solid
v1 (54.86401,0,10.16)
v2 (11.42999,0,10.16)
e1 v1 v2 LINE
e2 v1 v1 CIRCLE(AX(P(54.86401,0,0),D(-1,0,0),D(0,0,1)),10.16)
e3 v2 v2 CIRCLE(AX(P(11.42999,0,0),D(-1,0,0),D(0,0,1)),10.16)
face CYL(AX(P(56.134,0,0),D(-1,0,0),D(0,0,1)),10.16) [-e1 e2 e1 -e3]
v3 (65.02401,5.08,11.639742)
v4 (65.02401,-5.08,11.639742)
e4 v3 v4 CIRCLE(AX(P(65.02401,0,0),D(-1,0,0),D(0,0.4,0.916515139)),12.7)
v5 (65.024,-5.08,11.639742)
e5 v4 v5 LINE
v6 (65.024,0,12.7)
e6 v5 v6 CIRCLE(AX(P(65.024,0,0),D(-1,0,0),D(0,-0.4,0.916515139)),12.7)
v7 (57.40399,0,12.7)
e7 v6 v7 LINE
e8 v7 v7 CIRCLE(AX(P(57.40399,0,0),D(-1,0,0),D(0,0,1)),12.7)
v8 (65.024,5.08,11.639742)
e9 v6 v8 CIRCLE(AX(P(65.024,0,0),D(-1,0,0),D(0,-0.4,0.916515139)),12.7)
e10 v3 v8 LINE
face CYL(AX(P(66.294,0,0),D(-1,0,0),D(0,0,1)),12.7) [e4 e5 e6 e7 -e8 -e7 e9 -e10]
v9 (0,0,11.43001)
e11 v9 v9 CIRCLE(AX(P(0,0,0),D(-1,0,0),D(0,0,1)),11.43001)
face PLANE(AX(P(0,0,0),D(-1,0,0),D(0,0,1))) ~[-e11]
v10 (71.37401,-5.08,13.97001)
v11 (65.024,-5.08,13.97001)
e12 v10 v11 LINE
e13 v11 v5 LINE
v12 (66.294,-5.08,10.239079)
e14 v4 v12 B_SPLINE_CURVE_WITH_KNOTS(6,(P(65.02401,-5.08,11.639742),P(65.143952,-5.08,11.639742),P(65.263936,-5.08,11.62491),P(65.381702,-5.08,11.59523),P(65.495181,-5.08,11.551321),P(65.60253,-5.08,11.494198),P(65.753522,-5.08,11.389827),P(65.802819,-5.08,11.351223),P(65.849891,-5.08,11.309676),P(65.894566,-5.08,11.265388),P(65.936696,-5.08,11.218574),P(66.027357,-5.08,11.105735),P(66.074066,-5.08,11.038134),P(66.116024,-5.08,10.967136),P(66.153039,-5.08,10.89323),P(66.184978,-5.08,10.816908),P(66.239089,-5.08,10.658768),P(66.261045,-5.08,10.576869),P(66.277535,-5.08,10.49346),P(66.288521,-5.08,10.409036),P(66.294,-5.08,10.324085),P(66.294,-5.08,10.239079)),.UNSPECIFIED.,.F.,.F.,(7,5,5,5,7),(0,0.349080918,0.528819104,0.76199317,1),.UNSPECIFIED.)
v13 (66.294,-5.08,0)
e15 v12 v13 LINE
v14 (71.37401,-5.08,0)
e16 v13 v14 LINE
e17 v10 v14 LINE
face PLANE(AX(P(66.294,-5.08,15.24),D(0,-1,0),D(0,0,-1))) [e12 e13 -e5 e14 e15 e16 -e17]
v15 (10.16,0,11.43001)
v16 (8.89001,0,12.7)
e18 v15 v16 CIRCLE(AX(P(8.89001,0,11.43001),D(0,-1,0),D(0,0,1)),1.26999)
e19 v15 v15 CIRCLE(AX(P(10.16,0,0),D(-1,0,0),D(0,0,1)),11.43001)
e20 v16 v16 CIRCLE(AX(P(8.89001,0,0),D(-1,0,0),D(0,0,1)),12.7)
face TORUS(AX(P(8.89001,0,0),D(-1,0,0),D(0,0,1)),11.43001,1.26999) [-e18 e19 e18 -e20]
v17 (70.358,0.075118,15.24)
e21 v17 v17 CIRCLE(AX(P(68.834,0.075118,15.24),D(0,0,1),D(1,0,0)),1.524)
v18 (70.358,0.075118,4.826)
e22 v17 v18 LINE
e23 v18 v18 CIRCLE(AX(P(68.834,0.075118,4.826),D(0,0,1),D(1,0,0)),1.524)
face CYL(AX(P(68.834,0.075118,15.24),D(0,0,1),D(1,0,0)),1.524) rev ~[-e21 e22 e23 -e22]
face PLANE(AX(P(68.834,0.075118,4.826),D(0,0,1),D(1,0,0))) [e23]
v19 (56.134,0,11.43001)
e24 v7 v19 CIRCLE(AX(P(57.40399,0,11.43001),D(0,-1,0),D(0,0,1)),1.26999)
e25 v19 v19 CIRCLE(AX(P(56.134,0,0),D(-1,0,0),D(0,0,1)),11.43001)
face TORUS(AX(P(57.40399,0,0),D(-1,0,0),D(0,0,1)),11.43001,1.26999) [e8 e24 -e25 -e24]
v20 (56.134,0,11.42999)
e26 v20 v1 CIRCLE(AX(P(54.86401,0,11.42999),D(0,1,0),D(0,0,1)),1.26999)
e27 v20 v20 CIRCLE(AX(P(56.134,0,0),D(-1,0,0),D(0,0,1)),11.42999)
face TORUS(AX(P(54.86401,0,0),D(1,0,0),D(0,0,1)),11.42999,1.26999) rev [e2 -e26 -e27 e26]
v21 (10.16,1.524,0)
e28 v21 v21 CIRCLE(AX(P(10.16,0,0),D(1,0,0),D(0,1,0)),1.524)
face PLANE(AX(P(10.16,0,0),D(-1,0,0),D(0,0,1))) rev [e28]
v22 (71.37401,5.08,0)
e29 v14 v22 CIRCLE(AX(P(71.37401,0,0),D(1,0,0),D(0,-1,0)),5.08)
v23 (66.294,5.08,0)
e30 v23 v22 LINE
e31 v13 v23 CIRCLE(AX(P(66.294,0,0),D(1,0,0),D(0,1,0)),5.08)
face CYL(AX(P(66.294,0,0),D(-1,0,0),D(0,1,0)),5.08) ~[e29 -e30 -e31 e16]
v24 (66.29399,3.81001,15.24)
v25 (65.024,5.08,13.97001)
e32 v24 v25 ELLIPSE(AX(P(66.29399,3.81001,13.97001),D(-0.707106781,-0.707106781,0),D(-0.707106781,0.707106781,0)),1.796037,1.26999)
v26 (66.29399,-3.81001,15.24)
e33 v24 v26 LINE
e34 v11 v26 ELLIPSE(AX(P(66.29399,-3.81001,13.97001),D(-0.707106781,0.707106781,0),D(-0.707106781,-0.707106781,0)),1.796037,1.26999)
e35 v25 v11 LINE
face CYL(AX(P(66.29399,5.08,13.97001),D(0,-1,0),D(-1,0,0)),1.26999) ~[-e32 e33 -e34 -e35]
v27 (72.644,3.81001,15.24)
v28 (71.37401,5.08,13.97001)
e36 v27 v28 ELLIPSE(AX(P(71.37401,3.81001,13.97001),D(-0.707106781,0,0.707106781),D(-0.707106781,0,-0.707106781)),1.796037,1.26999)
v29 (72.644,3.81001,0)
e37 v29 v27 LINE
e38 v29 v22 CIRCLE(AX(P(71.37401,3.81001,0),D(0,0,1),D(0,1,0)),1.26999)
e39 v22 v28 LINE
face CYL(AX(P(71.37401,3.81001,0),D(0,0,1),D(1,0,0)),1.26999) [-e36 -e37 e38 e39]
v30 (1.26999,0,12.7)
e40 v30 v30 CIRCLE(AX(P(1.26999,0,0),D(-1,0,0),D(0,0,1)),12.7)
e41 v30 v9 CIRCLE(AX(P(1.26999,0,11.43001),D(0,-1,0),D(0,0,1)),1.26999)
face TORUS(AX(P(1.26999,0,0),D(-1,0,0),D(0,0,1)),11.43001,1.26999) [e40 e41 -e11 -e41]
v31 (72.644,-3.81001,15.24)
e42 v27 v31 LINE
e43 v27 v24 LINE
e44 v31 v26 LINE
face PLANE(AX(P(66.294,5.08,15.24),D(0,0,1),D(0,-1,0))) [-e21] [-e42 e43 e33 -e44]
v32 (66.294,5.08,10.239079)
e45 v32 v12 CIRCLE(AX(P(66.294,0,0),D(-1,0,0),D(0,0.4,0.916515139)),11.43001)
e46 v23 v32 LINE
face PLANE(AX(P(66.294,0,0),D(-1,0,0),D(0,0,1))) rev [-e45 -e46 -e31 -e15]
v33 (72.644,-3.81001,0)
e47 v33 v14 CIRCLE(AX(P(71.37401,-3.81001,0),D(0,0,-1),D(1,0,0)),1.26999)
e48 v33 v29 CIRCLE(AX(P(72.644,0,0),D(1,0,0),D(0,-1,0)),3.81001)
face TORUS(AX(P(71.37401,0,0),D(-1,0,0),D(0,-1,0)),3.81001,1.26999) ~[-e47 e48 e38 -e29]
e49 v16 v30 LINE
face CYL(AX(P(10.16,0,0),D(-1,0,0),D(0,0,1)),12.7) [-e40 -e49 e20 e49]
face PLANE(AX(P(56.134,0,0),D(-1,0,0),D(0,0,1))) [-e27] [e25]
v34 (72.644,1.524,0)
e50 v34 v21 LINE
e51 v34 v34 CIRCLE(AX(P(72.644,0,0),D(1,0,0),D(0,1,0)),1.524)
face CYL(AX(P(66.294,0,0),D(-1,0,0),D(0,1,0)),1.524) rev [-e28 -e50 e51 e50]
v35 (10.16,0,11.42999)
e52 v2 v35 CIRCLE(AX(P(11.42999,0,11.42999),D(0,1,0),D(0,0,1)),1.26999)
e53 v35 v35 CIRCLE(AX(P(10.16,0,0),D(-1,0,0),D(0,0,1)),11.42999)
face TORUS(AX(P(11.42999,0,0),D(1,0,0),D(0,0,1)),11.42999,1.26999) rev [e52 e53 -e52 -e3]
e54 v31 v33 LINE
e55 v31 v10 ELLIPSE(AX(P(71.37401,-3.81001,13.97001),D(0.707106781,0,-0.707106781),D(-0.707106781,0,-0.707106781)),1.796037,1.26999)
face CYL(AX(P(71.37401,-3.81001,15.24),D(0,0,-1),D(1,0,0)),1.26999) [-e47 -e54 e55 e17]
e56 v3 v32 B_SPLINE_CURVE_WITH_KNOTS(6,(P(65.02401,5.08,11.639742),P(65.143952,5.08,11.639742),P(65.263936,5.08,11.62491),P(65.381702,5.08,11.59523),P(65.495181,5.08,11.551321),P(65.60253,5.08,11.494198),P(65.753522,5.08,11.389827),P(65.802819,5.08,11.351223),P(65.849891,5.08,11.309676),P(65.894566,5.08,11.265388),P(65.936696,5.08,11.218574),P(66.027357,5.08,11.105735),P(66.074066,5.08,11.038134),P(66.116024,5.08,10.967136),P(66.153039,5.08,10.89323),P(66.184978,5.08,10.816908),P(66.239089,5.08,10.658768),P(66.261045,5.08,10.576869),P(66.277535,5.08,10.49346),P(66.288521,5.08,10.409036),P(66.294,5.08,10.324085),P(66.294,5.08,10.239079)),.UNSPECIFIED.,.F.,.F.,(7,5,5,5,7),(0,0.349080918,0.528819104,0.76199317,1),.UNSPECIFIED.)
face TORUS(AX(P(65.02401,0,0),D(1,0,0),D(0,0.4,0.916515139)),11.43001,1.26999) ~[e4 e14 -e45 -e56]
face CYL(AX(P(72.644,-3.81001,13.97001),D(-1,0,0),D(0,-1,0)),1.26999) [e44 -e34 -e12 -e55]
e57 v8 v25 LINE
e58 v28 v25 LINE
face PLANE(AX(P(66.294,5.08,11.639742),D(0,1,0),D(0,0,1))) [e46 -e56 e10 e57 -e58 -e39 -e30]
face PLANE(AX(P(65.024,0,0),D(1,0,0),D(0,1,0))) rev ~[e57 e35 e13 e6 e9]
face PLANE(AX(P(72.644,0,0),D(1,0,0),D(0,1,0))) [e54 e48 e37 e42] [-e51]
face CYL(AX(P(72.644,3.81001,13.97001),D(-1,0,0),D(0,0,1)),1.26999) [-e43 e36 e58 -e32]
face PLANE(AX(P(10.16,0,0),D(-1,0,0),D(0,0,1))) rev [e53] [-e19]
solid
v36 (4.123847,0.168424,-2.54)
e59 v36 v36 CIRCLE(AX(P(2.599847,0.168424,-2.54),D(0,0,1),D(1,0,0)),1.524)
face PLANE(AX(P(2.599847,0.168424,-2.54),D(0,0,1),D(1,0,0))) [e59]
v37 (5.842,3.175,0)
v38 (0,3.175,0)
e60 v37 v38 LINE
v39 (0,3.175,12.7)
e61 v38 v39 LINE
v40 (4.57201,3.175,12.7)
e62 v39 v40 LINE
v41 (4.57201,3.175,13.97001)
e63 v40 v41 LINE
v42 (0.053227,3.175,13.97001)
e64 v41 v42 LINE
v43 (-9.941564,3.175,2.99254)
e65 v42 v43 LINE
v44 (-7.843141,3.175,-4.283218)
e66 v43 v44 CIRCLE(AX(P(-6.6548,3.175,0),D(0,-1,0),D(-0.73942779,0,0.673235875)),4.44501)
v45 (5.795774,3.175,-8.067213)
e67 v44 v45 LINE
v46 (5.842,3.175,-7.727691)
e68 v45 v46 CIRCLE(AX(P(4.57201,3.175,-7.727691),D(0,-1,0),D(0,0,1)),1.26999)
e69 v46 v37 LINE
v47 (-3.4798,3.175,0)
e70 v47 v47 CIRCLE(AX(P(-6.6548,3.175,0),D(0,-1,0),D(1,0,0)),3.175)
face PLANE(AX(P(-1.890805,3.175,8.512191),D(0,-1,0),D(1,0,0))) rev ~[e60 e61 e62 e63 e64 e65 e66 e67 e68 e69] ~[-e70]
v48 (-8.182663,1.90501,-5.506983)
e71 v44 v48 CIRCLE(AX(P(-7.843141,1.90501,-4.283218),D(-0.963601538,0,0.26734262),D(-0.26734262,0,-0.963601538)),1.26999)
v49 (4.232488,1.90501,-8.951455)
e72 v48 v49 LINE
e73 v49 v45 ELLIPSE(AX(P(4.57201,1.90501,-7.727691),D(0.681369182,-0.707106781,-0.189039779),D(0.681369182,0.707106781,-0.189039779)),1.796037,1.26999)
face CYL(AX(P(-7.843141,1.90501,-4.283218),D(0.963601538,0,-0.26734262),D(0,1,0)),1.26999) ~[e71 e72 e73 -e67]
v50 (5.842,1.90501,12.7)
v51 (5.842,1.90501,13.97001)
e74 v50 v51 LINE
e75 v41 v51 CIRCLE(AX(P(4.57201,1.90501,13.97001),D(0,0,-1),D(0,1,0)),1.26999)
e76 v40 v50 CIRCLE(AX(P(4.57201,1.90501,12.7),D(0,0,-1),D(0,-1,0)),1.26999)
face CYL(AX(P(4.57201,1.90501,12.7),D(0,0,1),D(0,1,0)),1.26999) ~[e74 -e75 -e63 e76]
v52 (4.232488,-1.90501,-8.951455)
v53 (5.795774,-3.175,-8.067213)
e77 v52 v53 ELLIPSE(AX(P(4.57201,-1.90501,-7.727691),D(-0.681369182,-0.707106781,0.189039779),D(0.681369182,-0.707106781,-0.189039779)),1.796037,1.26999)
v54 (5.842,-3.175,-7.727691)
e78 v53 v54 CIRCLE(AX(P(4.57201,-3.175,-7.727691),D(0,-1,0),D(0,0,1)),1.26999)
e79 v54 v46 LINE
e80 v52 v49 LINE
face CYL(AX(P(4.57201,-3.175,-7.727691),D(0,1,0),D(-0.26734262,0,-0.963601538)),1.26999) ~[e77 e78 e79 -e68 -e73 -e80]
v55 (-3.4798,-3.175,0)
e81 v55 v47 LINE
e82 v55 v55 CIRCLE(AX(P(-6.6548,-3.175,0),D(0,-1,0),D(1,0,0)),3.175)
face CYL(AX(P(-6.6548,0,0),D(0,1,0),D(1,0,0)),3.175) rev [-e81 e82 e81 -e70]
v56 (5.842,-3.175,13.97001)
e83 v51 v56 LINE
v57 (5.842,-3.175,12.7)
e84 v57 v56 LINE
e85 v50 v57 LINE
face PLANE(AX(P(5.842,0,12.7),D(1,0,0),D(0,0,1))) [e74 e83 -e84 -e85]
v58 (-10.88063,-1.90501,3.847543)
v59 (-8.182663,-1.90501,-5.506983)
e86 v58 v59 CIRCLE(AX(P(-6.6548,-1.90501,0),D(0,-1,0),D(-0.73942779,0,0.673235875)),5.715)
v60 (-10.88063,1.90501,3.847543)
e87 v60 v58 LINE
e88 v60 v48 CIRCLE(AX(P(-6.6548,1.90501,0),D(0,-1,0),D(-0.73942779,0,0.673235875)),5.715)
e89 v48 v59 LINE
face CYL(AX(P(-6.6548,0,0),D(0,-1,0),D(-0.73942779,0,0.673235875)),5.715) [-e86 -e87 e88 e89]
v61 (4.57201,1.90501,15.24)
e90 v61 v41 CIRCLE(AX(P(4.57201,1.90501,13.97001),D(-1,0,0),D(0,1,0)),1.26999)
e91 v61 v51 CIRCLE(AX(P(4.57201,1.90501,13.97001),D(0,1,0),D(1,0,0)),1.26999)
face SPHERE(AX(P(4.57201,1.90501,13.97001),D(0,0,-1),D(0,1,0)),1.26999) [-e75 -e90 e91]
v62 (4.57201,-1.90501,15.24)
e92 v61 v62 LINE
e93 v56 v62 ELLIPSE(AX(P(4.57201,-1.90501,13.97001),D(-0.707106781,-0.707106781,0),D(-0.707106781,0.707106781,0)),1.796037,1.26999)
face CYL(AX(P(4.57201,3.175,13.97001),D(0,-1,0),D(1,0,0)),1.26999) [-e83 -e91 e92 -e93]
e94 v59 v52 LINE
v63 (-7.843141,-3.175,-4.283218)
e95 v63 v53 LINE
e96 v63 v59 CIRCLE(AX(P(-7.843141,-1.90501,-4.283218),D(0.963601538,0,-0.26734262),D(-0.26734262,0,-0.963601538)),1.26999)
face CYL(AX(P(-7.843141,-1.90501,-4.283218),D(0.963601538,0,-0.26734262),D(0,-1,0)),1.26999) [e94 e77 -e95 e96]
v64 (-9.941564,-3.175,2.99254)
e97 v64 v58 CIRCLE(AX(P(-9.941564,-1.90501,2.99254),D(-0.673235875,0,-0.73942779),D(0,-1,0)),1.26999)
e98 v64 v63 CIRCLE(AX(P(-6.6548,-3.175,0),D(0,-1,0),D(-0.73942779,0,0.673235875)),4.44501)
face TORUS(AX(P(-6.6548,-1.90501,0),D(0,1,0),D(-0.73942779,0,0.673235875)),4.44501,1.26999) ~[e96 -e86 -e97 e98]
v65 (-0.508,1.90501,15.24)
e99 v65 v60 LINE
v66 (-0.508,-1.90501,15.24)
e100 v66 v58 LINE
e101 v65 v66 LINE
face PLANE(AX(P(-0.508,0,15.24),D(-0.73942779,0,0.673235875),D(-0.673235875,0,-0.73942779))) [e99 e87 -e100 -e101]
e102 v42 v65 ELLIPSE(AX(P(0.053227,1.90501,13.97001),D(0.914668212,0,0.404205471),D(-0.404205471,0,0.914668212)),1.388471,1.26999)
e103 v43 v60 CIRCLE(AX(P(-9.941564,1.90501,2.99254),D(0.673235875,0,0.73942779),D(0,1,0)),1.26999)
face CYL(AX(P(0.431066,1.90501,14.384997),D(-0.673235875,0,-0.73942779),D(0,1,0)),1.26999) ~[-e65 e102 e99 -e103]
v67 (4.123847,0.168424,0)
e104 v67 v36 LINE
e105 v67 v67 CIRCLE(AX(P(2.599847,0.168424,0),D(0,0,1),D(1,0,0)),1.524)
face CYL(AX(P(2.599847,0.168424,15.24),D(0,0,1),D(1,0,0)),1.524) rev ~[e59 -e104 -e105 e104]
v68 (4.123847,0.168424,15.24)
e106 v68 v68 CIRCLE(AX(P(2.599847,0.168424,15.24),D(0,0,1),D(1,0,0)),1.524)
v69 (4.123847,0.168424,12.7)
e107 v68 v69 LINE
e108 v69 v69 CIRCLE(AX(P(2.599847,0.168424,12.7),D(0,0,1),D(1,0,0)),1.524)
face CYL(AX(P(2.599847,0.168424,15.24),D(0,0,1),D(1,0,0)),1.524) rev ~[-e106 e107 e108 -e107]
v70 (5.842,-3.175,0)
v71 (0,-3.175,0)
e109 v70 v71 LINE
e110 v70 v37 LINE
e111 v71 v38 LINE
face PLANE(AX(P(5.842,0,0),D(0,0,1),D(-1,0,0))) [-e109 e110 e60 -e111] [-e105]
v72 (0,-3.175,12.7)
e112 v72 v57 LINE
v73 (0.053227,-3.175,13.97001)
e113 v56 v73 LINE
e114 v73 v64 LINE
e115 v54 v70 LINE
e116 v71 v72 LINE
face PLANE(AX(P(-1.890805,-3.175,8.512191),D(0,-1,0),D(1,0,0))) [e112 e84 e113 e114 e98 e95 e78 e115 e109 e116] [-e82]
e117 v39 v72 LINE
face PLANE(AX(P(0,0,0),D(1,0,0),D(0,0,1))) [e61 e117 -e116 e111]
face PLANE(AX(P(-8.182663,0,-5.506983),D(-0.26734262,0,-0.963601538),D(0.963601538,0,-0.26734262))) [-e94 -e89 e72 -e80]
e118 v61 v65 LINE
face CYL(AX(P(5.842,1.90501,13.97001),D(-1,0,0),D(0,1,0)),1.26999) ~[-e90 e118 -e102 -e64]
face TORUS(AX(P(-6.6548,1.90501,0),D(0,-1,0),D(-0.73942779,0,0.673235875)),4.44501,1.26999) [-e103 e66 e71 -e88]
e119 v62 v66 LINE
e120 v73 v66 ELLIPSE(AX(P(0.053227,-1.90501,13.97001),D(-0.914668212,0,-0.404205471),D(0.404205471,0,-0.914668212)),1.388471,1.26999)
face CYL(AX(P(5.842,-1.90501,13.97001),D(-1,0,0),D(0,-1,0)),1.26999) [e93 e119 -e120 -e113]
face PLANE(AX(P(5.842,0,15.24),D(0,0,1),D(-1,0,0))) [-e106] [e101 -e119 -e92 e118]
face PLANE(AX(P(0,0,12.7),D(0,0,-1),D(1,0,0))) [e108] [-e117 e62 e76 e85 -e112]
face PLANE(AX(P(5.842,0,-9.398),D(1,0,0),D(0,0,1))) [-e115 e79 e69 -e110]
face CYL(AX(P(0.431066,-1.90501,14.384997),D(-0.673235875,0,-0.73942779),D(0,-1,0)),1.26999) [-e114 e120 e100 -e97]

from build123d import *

# Parameters (mm, degrees)
F0_W      = 5.842
F0_H      = 12.7
F0_R      = 3.175
F2_DEPTH  = 3.175
F3_R      = 1.524
F4_DEPTH  = 6.35
F5_DEPTH  = 1.27
F6_DEPTH  = 56.134
F7_R      = 1.524
F9_DEPTH  = 17.78
F8_R      = 1.524
F10_DEPTH = 10.414
F11_R     = 1.26999
F11_2_R   = 1.26999


# Not quite as in the source:
# - a fillet or chamfer is up to 0.001 mm smaller than in the source, because OpenCascade refuses the exact size


with BuildPart() as f1:
    # F0 (on Front) → F1 (revolve)
    with BuildSketch(Plane.XZ):
        Polygon((5.842, 12.7), (5.842, 0), (66.294, 0), (66.294, 12.7), (56.134, 12.7), (56.134, 10.16), (10.16, 10.16), (10.16, 12.7), align=None)
        with Locations((2.921, 6.35)):
            Rectangle(F0_W, F0_H)
    revolve(axis=Axis((33.147, 0, 0), (-1, 0, 0)))

    # F3 (on face) → F4 (join)
    with BuildSketch(Plane.YZ.offset(66.294)):
        with BuildLine():
            ThreePointArc((-5.08, 0), (0, -5.08), (5.08, 0))
            ThreePointArc((5.08, 0), (0, 5.08), (-5.08, 0))
        make_face()
        Circle(F3_R, mode=Mode.SUBTRACT)
        with BuildLine():
            ThreePointArc((-5.08, 0), (0, 5.08), (5.08, 0))
            Line((5.08, 0), (5.08, 11.6397422652))
            ThreePointArc((5.08, 11.6397422652), (0, 12.7), (-5.08, 11.6397422652))
            Line((-5.08, 11.6397422652), (-5.08, 0))
        make_face()
        with BuildLine():
            ThreePointArc((-5.08, 11.6397422652), (0, 12.7), (5.08, 11.6397422652))
            Line((5.08, 11.6397422652), (5.08, 15.24))
            Line((5.08, 15.24), (-5.08, 15.24))
            Line((-5.08, 15.24), (-5.08, 11.6397422652))
        make_face()
    extrude(amount=F4_DEPTH)

    # F5 (add): a face of the model
    f5_faces = [f1.faces().sort_by_distance(p)[0] for p in [
        (66.294, 0, 13.7792682875),
    ]]
    extrude(f5_faces, amount=F5_DEPTH)

    # F6 (cut, through all): a face of the model
    f6_faces = [f1.faces().sort_by_distance(p)[0] for p in [
        (66.294, 0, 0),
    ]]
    extrude(f6_faces, amount=-F6_DEPTH, mode=Mode.SUBTRACT)

    # F8 (on face) → F10 (cut)
    with BuildSketch(Plane.XY.offset(15.24)):
        with Locations((68.834, 0.0751180435)):
            Circle(F8_R)
    extrude(amount=-F10_DEPTH, mode=Mode.SUBTRACT)

    # F11 (radius 1.27 in the source; OpenCascade refuses exactly that, so slightly less here)
    f11_edges = [f1.edges().sort_by_distance(p)[0] for p in [
        (68.834, 5.08, 15.24),
        (72.644, 5.08, 7.62),
        (68.834, -5.08, 15.24),
        (65.024, 0, 15.24),
        (66.294, 0, -12.7),
        (10.16, 0, -10.16),
        (0, 0, -12.7),
        (56.134, 0, -12.7),
        (56.134, 0, -10.16),
        (33.147, 0, 10.16),
        (10.16, 0, -12.7),
        (5.08, 0, 12.7),
        (72.644, -5.08, 7.62),
        (72.644, 0, -5.08),
    ]]
    fillet(f11_edges, radius=F11_R)


with BuildPart() as f2:
    # F0 (on Front) → F2 (new body, symmetric)
    with BuildSketch(Plane.XZ):
        with BuildLine():
            Line((-0.9398, 0), (0, 0))
            Line((0, 0), (0, 12.7))
            Line((0, 12.7), (5.842, 12.7))
            Line((5.842, 12.7), (5.842, 15.24))
            Line((5.842, 15.24), (-0.508, 15.24))
            Line((-0.508, 15.24), (-10.8806298187, 3.8475430269))
            ThreePointArc((-10.8806298187, 3.8475430269), (-4.5919612295, 5.3297205562), (-0.9398, 0))
        make_face()
        with BuildLine():
            ThreePointArc((-8.1826630726, -5.5069827884), (-3.1957909266, -4.5493385486), (-0.9398, 0))
            ThreePointArc((-0.9398, 0), (-4.5919612295, 5.3297205562), (-10.8806298187, 3.8475430269))
            ThreePointArc((-10.8806298187, 3.8475430269), (-12.1459778134, -1.5837270034), (-8.1826630726, -5.5069827884))
        make_face()
        with Locations((-6.6548, 0)):
            Circle(F0_R, mode=Mode.SUBTRACT)
        with BuildLine():
            Line((5.842, 0), (0, 0))
            Line((0, 0), (-0.9398, 0))
            ThreePointArc((-0.9398, 0), (-3.1957909266, -4.5493385486), (-8.1826630726, -5.5069827884))
            Line((-8.1826630726, -5.5069827884), (5.842, -9.398))
            Line((5.842, -9.398), (5.842, 0))
        make_face()
    extrude(amount=F2_DEPTH, both=True)

    # F7 (on face) → F9 (cut)
    with BuildSketch(Plane.XY.offset(15.24)):
        with Locations((2.5998465717, 0.1684235758)):
            Circle(F7_R)
    extrude(amount=-F9_DEPTH, mode=Mode.SUBTRACT)

    # F11#2 (radius 1.27 in the source; OpenCascade refuses exactly that, so slightly less here)
    f11_2_edges = [f2.edges().sort_by_distance(p)[0] for p in [
        (5.842, 3.175, 13.97),
        (2.667, 3.175, 15.24),
        (-1.170332, 3.175, -7.452491),
        (-8.182663, 0, -5.506983),
        (5.842, 0, -9.398),
        (-1.170332, -3.175, -7.452491),
        (2.667, -3.175, 15.24),
        (5.842, 0, 15.24),
        (-5.694315, 3.175, 9.543772),
        (-12.145978, 3.175, -1.583727),
        (-5.694315, -3.175, 9.543772),
        (-12.145978, -3.175, -1.583727),
    ]]
    fillet(f11_2_edges, radius=F11_2_R)


solid = Compound([f1.part, f2.part])
